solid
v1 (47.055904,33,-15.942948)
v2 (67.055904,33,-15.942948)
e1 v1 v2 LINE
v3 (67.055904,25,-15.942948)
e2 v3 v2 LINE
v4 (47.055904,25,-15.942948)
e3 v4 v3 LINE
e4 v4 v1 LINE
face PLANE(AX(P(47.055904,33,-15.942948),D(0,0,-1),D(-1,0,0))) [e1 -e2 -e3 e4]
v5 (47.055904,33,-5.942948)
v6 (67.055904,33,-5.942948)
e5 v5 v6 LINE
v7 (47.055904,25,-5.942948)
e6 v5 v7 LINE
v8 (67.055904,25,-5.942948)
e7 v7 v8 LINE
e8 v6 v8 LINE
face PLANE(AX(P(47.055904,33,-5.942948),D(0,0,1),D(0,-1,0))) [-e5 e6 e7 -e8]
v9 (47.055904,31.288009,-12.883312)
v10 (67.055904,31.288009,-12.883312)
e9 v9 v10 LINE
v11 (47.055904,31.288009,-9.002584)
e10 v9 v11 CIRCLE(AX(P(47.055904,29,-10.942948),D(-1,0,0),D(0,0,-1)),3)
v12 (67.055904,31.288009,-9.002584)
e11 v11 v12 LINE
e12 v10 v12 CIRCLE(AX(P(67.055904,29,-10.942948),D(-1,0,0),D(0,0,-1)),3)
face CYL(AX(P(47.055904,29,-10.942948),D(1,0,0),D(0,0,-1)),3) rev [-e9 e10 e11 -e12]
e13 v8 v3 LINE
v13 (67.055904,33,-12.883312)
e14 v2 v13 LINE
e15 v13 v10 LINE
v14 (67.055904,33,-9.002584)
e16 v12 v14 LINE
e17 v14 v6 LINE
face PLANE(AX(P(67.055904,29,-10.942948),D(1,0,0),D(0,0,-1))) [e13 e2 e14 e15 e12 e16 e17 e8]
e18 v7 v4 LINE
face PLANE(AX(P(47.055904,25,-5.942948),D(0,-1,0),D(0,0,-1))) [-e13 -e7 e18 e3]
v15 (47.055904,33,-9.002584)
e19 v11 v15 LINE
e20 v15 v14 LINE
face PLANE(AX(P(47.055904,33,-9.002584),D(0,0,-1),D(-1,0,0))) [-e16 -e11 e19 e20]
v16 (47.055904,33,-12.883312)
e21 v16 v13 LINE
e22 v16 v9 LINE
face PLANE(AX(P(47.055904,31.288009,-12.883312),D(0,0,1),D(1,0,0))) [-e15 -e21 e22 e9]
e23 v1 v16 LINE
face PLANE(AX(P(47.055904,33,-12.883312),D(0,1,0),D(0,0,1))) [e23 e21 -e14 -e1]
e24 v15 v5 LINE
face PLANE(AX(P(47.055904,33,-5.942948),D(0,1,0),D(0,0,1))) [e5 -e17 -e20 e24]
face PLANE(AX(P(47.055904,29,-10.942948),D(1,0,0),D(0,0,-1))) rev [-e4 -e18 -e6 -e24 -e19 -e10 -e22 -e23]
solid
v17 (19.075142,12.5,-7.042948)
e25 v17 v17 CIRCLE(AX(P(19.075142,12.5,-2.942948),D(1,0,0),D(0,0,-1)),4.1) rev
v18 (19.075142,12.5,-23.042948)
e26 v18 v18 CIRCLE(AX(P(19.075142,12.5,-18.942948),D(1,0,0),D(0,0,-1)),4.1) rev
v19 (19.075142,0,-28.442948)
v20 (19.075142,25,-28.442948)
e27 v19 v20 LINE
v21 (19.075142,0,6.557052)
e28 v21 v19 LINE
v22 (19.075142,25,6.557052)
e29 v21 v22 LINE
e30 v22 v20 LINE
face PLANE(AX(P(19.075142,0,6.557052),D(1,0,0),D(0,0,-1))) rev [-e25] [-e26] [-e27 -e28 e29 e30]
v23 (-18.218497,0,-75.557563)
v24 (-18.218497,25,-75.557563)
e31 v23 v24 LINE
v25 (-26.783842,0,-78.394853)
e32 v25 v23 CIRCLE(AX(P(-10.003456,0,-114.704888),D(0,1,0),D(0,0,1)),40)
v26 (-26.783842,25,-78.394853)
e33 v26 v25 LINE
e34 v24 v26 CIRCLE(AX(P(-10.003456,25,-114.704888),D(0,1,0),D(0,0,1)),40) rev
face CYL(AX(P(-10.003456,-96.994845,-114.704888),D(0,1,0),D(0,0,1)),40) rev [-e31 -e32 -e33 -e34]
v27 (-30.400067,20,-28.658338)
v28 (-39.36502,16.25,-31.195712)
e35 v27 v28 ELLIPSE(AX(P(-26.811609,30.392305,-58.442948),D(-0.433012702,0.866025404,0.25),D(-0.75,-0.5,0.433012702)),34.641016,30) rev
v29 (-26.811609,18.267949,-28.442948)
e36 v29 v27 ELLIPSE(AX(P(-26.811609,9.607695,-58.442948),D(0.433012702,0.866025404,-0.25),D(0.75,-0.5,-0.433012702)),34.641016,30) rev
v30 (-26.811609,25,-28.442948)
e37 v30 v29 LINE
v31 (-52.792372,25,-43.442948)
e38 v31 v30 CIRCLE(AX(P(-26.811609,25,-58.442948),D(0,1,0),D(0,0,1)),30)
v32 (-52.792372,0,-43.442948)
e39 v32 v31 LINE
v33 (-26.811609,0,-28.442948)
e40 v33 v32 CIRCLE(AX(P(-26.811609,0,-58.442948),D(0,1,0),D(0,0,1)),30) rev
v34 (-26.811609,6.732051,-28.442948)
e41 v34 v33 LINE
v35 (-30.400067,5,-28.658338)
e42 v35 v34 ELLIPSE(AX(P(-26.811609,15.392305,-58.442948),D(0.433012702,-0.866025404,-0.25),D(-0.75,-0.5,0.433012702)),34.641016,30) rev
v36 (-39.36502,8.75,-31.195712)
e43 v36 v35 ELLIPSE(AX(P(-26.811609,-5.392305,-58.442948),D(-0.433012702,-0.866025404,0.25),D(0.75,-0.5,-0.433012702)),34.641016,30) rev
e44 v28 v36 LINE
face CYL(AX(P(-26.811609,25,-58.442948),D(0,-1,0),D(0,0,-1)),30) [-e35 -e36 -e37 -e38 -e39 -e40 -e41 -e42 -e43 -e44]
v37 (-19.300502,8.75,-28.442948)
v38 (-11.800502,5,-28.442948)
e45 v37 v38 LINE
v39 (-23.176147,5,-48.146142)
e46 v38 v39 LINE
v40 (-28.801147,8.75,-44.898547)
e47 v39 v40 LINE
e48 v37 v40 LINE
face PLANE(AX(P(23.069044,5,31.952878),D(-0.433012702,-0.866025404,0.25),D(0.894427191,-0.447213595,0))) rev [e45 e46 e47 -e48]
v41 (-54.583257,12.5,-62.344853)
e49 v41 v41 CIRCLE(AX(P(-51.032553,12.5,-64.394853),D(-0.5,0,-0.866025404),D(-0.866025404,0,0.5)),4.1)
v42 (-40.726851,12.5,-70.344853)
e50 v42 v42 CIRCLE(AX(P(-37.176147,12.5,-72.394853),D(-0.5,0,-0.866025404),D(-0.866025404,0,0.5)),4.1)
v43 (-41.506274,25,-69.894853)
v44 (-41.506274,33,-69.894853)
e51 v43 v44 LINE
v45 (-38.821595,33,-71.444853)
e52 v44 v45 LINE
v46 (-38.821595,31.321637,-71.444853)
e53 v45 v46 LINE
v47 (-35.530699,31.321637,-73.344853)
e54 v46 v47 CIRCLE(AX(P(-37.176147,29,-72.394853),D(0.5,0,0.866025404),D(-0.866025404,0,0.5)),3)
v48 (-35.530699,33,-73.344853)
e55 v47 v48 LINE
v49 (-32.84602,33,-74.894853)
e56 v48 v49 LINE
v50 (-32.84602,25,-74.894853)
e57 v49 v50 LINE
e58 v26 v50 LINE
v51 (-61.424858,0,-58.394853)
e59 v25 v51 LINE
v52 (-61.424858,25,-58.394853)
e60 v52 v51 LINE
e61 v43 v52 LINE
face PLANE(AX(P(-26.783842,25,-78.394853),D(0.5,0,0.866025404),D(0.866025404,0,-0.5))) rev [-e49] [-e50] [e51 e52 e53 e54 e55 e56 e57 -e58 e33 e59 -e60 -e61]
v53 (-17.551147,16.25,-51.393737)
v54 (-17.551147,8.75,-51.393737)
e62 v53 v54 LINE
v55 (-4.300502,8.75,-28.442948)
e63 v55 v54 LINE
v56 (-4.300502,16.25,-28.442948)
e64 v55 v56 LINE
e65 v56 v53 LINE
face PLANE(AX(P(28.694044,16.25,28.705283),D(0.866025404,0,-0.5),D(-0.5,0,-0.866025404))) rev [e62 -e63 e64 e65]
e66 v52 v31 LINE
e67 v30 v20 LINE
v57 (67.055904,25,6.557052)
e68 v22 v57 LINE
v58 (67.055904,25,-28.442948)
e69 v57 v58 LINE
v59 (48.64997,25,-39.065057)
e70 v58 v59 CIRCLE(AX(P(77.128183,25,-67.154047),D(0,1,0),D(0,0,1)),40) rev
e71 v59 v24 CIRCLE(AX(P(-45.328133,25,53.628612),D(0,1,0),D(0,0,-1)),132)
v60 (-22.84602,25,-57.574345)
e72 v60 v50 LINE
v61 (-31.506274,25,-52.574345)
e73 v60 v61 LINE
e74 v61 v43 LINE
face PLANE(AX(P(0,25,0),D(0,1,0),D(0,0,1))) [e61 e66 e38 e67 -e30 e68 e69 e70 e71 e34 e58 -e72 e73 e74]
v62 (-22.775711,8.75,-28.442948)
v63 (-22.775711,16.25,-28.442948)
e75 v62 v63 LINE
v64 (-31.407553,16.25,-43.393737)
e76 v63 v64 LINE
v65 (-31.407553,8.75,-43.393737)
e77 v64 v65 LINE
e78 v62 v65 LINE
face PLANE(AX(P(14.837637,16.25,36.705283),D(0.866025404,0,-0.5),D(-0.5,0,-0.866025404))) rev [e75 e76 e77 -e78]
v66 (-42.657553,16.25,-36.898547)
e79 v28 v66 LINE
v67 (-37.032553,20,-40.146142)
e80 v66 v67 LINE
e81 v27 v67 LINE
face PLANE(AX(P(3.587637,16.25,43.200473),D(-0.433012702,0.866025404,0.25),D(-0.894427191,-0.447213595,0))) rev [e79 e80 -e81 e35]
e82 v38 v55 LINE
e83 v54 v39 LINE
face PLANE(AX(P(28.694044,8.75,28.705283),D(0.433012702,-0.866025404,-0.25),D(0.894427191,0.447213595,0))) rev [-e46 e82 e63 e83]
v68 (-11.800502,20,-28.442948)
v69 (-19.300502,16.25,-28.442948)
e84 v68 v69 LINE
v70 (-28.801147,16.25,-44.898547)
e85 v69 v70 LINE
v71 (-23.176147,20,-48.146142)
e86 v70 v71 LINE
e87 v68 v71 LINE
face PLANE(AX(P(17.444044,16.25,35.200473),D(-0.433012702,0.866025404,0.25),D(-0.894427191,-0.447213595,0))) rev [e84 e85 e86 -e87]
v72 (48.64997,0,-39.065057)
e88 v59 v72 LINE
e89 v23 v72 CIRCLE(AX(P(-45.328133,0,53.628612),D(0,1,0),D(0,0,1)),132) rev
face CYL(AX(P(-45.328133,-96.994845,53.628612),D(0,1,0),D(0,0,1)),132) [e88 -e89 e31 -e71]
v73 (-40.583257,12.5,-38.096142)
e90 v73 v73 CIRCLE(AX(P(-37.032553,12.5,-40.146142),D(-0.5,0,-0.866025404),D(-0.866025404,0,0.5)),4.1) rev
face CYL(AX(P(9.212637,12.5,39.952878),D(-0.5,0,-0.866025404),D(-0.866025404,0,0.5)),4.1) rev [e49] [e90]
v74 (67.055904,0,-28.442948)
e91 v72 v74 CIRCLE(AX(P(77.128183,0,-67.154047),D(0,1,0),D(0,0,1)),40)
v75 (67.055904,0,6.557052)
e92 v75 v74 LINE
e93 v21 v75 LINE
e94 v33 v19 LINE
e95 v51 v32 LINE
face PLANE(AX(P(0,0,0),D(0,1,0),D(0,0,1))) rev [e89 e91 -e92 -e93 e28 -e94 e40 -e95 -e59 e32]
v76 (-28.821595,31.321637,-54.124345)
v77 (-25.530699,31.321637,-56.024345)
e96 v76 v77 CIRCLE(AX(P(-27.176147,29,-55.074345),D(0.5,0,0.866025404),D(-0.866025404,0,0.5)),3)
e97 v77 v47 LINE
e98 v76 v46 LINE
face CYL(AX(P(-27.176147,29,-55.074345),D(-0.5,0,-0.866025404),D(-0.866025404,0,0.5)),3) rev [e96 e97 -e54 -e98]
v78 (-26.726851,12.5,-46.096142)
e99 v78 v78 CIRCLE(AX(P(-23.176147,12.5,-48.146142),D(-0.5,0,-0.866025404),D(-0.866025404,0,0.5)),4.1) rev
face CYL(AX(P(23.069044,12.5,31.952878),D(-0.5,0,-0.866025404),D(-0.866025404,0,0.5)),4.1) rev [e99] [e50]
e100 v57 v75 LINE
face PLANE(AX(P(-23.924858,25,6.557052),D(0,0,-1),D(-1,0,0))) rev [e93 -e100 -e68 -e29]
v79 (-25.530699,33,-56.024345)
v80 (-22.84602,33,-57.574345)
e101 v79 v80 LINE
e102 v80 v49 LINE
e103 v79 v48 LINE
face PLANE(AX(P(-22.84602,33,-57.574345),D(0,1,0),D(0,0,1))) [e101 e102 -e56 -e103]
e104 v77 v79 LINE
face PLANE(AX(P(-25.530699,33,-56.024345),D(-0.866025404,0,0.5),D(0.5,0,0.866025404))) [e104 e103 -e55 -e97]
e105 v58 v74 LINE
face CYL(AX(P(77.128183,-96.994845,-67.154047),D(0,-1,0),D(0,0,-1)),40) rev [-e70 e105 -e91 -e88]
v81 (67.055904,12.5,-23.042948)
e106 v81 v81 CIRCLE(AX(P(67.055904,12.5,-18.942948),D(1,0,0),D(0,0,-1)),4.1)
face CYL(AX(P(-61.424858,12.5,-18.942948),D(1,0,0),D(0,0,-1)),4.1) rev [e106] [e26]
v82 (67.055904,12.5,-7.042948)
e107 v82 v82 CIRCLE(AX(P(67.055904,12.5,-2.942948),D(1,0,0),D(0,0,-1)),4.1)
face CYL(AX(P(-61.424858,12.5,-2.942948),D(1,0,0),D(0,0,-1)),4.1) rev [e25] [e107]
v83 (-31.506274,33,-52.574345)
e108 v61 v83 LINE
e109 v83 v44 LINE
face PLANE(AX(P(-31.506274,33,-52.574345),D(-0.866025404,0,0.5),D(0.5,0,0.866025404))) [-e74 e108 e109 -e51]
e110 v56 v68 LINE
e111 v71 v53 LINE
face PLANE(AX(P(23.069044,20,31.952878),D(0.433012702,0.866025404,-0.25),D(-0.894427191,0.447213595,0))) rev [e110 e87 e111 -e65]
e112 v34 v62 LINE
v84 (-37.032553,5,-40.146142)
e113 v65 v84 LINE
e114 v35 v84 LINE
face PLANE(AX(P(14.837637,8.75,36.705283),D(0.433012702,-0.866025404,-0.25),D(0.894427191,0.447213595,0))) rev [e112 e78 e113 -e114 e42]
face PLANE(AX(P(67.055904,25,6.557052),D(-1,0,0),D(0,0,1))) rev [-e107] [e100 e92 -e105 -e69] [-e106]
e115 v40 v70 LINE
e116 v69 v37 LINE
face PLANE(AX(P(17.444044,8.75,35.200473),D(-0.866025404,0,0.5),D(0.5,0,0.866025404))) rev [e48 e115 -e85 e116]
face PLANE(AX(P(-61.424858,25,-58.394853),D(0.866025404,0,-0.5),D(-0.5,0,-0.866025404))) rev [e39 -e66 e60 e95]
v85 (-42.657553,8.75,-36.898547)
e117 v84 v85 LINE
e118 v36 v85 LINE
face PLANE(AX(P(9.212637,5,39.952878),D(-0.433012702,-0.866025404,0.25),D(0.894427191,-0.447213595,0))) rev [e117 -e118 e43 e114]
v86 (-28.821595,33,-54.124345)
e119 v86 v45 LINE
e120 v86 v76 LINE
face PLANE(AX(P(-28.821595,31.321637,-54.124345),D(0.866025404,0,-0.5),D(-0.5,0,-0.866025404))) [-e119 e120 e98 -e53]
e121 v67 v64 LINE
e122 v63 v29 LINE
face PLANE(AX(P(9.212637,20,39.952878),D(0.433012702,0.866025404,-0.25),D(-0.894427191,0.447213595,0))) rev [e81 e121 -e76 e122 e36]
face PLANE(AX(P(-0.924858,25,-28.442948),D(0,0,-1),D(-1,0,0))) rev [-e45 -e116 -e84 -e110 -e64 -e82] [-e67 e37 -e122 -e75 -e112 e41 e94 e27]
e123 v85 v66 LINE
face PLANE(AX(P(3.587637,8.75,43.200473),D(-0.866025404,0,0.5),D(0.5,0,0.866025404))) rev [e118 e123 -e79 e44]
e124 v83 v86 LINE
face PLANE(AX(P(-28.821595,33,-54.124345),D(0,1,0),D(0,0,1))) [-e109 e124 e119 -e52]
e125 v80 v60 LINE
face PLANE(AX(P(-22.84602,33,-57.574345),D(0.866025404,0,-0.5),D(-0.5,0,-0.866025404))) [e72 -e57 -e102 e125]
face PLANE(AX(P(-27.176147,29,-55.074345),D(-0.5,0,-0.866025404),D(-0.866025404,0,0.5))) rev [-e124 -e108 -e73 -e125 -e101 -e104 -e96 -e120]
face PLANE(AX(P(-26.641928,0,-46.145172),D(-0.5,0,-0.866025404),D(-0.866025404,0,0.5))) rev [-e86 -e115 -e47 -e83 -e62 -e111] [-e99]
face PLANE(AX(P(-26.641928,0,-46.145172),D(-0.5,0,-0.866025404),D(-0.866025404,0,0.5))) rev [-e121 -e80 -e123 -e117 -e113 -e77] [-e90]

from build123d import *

# Parameters (mm, degrees)
BOSS_EXTRUDE1_DEPTH = 25
SKETCH2_R           = 4.1
CUT_EXTRUDE1_DEPTH  = 153.571488895
SKETCH3_R           = 4.1
CUT_EXTRUDE2_DEPTH  = 135.704378021
CUT_EXTRUDE4_START  = -28
CUT_EXTRUDE4_DEPTH  = 107.704378021
CHAMFER1_SIZE       = 56
CUT_EXTRUDE5_DEPTH  = 107.147290362
BOSS_EXTRUDE2_DEPTH = 20
BOSS_EXTRUDE3_DEPTH = 20
SKETCH9_W           = 20
SKETCH9_H           = 35
CUT_EXTRUDE6_DEPTH  = 107.147290362
BOSS_EXTRUDE4_DEPTH = 25
FILLET1_R           = 40
FILLET2_R           = 30


with BuildPart() as part:
    # Sketch1 → Boss-Extrude1 (new body)
    with BuildSketch(Plane(origin=(0, 0, 0), x_dir=(1, 0, 0), z_dir=(0, 1, 0))):
        Polygon((-61.424858117, 58.394853086), (-23.924858117, -6.557052198), (67.055903996, -6.557052198), (67.055903996, 28.442947802), (2.055903996, 28.442947802), (-26.783841966, 78.394853086), align=None)
    extrude(amount=BOSS_EXTRUDE1_DEPTH)

    # Sketch2 → Cut-Extrude1 (cut, through all)
    with BuildSketch(Plane(origin=(67.055903996, 0, 0), x_dir=(0, 0, -1), z_dir=(1, 0, 0))):
        with Locations((2.942947802, 12.5)):
            Circle(SKETCH2_R)
        with Locations((18.942947802, 12.5)):
            Circle(SKETCH2_R)
    extrude(amount=-CUT_EXTRUDE1_DEPTH, mode=Mode.SUBTRACT)

    # Sketch3 → Cut-Extrude2 (cut, through all)
    with BuildSketch(Plane(origin=(-40.641927641, 0, -70.393883591), x_dir=(-0.8660254037844396, 0, 0.4999999999999984), z_dir=(-0.49999999999999833, 0, -0.8660254037844395))):
        with Locations((-4.00193899, 12.5)):
            Circle(SKETCH3_R)
        with Locations((11.99806101, 12.5)):
            Circle(SKETCH3_R)
    extrude(amount=-CUT_EXTRUDE2_DEPTH, mode=Mode.SUBTRACT)

    # Sketch5 → Cut-Extrude4 (cut, through all)
    with BuildSketch(Plane(origin=(-40.641927641, 0, -70.393883591), x_dir=(-0.8660254037844397, 0, 0.4999999999999983), z_dir=(-0.4999999999999982, 0, -0.8660254037844396)).offset(CUT_EXTRUDE4_START)):
        Polygon((-10.497129518, 16.25), (-10.497129518, 8.75), (-4.00193899, 5), (2.493251539, 8.75), (2.493251539, 16.25), (-4.00193899, 20), align=None)
        Polygon((5.502870482, 8.75), (11.99806101, 5), (18.493251539, 8.75), (18.493251539, 16.25), (11.99806101, 20), (5.502870482, 16.25), align=None)
    extrude(amount=-CUT_EXTRUDE4_DEPTH, mode=Mode.SUBTRACT)

    # Chamfer1
    chamfer1_edges = [part.edges().sort_by_distance(p)[0] for p in [
        (2.055903996, 12.5, -28.442947802),
    ]]
    chamfer(chamfer1_edges, length=CHAMFER1_SIZE)

    # Sketch6 → Cut-Extrude5 (cut, through all)
    with BuildSketch(Plane.XZ):
        Polygon((-0.924858117, 6.557052198), (-0.924858117, -28.442947802), (-44.132117539, -28.442947802), (-23.924858117, 6.557052198), align=None)
    extrude(amount=-CUT_EXTRUDE5_DEPTH, mode=Mode.SUBTRACT)

    # Sketch7 → Boss-Extrude2 (add)
    with BuildSketch(Plane(origin=(-40.641927641, 0, -70.393883591), x_dir=(-0.86602540378444, 0, 0.49999999999999784), z_dir=(-0.49999999999999784, 0, -0.86602540378444))):
        with BuildLine():
            Line((0.99806101, 33), (0.99806101, 25))
            Line((0.99806101, 25), (-9.00193899, 25))
            Line((-9.00193899, 25), (-9.00193899, 33))
            Line((-9.00193899, 33), (-5.90193899, 33))
            Line((-5.90193899, 33), (-5.90193899, 31.321637353))
            ThreePointArc((-5.90193899, 31.321637353), (-4.00193899, 26), (-2.10193899, 31.321637353))
            Line((-2.10193899, 31.321637353), (-2.10193899, 33))
            Line((-2.10193899, 33), (0.99806101, 33))
        make_face()
    extrude(amount=-BOSS_EXTRUDE2_DEPTH)

    # Sketch9 → Cut-Extrude6 (cut, through all)
    with BuildSketch(Plane(origin=(0, 25, 0), x_dir=(1, 0, 0), z_dir=(0, 1, 0))):
        with Locations((9.075141883, 10.942947802)):
            Rectangle(SKETCH9_W, SKETCH9_H)
    extrude(amount=-CUT_EXTRUDE6_DEPTH, mode=Mode.SUBTRACT)

    # Sketch10 → Boss-Extrude4 (add)
    with BuildSketch(Plane(origin=(0, 25, 0), x_dir=(1, 0, 0), z_dir=(0, 1, 0))):
        with BuildLine():
            Line((58.055903996, 28.442947802), (-25.944096004, 76.940370414))
            ThreePointArc((-25.944096004, 76.940370414), (20.671866984, 60.686741527), (58.055903996, 28.442947802))
        make_face()
    extrude(amount=-BOSS_EXTRUDE4_DEPTH)

    # Fillet1
    # the kernel refuses this fillet: 40 mm, written as the material it adds along each edge
    with BuildSketch(Plane(origin=(-25.944096004, 0, -76.940370414), x_dir=(-0.4999999999999963, 0, -0.8660254037844409), z_dir=(0, 1, 0))) as fillet1_piece_1:
        with BuildLine():
            CenterArc((24.734711677, -32.687258101), FILLET1_R, 125.196366451, 12.952121212)
            Line((-5.060346158, -5.999160967), (-5.656247315, -5.465399025))
            ThreePointArc((-5.656247315, -5.465399025), (-3.097082225, -2.521387527), (-0.626569921, 0.497403391))
            Line((-0.626569921, 0.497403391), (0, 0.8))
            ThreePointArc((0, 0.8), (0.839745962, 0.8), (1.218387529, 0.653745162))
            Line((1.218387529, 0.653745162), (1.679491924, 0))
        make_face()
    extrude(amount=25)
    with BuildSketch(Plane(origin=(58.055903996, 0, -28.442947802), x_dir=(1, 0, 0), z_dir=(0, 1, 0))) as fillet1_piece_2:
        with BuildLine():
            CenterArc((19.072279139, 38.711099093), FILLET1_R, 224.605770428, 30.809763912)
            Line((-9.40593392, 10.622108705), (-9.975498181, 10.060328897))
            ThreePointArc((-9.975498181, 10.060328897), (-5.159081438, 4.907162549), (-0.626569921, -0.497403391))
            Line((-0.626569921, -0.497403391), (0, -0.8))
            ThreePointArc((0, -0.8), (4.5, -0.8), (8.798554417, -0.774221982))
            Line((8.798554417, -0.774221982), (9, 0))
        make_face()
    extrude(amount=25)

    # Fillet2
    # the kernel refuses this fillet: 30 mm, written as the material it takes off along each edge
    with BuildSketch(Plane(origin=(-44.132117539, -43.301270189, -28.442947802), x_dir=(-0.4999999999999983, 0, -0.8660254037844396), z_dir=(0, 1, 0))) as fillet2_piece_1:
        with BuildLine():
            CenterArc((FILLET2_R * 0.57735026919, -FILLET2_R), FILLET2_R, 90, 60)
            Line((-FILLET2_R * 0.288675134595, -FILLET2_R * 0.5), (0, 0))
            Line((0, 0), (FILLET2_R * 0.57735026919, 0))
        make_face()
    extrude(amount=111.602540378, mode=Mode.SUBTRACT)


with BuildPart() as body_2:
    # Sketch8 → Boss-Extrude3 (new body)
    with BuildSketch(Plane(origin=(67.055903996, 0, 0), x_dir=(0, 0, -1), z_dir=(1, 0, 0))):
        with BuildLine():
            Line((5.942947802, 33), (9.002583557, 33))
            Line((9.002583557, 33), (9.002583557, 31.288009309))
            ThreePointArc((9.002583557, 31.288009309), (10.942947802, 26), (12.883312047, 31.288009309))
            Line((12.883312047, 31.288009309), (12.883312047, 33))
            Line((12.883312047, 33), (15.942947802, 33))
            Line((15.942947802, 33), (15.942947802, 25))
            Line((15.942947802, 25), (5.942947802, 25))
            Line((5.942947802, 25), (5.942947802, 33))
        make_face()
    extrude(amount=-BOSS_EXTRUDE3_DEPTH)


solid = Compound([part.part, body_2.part])
